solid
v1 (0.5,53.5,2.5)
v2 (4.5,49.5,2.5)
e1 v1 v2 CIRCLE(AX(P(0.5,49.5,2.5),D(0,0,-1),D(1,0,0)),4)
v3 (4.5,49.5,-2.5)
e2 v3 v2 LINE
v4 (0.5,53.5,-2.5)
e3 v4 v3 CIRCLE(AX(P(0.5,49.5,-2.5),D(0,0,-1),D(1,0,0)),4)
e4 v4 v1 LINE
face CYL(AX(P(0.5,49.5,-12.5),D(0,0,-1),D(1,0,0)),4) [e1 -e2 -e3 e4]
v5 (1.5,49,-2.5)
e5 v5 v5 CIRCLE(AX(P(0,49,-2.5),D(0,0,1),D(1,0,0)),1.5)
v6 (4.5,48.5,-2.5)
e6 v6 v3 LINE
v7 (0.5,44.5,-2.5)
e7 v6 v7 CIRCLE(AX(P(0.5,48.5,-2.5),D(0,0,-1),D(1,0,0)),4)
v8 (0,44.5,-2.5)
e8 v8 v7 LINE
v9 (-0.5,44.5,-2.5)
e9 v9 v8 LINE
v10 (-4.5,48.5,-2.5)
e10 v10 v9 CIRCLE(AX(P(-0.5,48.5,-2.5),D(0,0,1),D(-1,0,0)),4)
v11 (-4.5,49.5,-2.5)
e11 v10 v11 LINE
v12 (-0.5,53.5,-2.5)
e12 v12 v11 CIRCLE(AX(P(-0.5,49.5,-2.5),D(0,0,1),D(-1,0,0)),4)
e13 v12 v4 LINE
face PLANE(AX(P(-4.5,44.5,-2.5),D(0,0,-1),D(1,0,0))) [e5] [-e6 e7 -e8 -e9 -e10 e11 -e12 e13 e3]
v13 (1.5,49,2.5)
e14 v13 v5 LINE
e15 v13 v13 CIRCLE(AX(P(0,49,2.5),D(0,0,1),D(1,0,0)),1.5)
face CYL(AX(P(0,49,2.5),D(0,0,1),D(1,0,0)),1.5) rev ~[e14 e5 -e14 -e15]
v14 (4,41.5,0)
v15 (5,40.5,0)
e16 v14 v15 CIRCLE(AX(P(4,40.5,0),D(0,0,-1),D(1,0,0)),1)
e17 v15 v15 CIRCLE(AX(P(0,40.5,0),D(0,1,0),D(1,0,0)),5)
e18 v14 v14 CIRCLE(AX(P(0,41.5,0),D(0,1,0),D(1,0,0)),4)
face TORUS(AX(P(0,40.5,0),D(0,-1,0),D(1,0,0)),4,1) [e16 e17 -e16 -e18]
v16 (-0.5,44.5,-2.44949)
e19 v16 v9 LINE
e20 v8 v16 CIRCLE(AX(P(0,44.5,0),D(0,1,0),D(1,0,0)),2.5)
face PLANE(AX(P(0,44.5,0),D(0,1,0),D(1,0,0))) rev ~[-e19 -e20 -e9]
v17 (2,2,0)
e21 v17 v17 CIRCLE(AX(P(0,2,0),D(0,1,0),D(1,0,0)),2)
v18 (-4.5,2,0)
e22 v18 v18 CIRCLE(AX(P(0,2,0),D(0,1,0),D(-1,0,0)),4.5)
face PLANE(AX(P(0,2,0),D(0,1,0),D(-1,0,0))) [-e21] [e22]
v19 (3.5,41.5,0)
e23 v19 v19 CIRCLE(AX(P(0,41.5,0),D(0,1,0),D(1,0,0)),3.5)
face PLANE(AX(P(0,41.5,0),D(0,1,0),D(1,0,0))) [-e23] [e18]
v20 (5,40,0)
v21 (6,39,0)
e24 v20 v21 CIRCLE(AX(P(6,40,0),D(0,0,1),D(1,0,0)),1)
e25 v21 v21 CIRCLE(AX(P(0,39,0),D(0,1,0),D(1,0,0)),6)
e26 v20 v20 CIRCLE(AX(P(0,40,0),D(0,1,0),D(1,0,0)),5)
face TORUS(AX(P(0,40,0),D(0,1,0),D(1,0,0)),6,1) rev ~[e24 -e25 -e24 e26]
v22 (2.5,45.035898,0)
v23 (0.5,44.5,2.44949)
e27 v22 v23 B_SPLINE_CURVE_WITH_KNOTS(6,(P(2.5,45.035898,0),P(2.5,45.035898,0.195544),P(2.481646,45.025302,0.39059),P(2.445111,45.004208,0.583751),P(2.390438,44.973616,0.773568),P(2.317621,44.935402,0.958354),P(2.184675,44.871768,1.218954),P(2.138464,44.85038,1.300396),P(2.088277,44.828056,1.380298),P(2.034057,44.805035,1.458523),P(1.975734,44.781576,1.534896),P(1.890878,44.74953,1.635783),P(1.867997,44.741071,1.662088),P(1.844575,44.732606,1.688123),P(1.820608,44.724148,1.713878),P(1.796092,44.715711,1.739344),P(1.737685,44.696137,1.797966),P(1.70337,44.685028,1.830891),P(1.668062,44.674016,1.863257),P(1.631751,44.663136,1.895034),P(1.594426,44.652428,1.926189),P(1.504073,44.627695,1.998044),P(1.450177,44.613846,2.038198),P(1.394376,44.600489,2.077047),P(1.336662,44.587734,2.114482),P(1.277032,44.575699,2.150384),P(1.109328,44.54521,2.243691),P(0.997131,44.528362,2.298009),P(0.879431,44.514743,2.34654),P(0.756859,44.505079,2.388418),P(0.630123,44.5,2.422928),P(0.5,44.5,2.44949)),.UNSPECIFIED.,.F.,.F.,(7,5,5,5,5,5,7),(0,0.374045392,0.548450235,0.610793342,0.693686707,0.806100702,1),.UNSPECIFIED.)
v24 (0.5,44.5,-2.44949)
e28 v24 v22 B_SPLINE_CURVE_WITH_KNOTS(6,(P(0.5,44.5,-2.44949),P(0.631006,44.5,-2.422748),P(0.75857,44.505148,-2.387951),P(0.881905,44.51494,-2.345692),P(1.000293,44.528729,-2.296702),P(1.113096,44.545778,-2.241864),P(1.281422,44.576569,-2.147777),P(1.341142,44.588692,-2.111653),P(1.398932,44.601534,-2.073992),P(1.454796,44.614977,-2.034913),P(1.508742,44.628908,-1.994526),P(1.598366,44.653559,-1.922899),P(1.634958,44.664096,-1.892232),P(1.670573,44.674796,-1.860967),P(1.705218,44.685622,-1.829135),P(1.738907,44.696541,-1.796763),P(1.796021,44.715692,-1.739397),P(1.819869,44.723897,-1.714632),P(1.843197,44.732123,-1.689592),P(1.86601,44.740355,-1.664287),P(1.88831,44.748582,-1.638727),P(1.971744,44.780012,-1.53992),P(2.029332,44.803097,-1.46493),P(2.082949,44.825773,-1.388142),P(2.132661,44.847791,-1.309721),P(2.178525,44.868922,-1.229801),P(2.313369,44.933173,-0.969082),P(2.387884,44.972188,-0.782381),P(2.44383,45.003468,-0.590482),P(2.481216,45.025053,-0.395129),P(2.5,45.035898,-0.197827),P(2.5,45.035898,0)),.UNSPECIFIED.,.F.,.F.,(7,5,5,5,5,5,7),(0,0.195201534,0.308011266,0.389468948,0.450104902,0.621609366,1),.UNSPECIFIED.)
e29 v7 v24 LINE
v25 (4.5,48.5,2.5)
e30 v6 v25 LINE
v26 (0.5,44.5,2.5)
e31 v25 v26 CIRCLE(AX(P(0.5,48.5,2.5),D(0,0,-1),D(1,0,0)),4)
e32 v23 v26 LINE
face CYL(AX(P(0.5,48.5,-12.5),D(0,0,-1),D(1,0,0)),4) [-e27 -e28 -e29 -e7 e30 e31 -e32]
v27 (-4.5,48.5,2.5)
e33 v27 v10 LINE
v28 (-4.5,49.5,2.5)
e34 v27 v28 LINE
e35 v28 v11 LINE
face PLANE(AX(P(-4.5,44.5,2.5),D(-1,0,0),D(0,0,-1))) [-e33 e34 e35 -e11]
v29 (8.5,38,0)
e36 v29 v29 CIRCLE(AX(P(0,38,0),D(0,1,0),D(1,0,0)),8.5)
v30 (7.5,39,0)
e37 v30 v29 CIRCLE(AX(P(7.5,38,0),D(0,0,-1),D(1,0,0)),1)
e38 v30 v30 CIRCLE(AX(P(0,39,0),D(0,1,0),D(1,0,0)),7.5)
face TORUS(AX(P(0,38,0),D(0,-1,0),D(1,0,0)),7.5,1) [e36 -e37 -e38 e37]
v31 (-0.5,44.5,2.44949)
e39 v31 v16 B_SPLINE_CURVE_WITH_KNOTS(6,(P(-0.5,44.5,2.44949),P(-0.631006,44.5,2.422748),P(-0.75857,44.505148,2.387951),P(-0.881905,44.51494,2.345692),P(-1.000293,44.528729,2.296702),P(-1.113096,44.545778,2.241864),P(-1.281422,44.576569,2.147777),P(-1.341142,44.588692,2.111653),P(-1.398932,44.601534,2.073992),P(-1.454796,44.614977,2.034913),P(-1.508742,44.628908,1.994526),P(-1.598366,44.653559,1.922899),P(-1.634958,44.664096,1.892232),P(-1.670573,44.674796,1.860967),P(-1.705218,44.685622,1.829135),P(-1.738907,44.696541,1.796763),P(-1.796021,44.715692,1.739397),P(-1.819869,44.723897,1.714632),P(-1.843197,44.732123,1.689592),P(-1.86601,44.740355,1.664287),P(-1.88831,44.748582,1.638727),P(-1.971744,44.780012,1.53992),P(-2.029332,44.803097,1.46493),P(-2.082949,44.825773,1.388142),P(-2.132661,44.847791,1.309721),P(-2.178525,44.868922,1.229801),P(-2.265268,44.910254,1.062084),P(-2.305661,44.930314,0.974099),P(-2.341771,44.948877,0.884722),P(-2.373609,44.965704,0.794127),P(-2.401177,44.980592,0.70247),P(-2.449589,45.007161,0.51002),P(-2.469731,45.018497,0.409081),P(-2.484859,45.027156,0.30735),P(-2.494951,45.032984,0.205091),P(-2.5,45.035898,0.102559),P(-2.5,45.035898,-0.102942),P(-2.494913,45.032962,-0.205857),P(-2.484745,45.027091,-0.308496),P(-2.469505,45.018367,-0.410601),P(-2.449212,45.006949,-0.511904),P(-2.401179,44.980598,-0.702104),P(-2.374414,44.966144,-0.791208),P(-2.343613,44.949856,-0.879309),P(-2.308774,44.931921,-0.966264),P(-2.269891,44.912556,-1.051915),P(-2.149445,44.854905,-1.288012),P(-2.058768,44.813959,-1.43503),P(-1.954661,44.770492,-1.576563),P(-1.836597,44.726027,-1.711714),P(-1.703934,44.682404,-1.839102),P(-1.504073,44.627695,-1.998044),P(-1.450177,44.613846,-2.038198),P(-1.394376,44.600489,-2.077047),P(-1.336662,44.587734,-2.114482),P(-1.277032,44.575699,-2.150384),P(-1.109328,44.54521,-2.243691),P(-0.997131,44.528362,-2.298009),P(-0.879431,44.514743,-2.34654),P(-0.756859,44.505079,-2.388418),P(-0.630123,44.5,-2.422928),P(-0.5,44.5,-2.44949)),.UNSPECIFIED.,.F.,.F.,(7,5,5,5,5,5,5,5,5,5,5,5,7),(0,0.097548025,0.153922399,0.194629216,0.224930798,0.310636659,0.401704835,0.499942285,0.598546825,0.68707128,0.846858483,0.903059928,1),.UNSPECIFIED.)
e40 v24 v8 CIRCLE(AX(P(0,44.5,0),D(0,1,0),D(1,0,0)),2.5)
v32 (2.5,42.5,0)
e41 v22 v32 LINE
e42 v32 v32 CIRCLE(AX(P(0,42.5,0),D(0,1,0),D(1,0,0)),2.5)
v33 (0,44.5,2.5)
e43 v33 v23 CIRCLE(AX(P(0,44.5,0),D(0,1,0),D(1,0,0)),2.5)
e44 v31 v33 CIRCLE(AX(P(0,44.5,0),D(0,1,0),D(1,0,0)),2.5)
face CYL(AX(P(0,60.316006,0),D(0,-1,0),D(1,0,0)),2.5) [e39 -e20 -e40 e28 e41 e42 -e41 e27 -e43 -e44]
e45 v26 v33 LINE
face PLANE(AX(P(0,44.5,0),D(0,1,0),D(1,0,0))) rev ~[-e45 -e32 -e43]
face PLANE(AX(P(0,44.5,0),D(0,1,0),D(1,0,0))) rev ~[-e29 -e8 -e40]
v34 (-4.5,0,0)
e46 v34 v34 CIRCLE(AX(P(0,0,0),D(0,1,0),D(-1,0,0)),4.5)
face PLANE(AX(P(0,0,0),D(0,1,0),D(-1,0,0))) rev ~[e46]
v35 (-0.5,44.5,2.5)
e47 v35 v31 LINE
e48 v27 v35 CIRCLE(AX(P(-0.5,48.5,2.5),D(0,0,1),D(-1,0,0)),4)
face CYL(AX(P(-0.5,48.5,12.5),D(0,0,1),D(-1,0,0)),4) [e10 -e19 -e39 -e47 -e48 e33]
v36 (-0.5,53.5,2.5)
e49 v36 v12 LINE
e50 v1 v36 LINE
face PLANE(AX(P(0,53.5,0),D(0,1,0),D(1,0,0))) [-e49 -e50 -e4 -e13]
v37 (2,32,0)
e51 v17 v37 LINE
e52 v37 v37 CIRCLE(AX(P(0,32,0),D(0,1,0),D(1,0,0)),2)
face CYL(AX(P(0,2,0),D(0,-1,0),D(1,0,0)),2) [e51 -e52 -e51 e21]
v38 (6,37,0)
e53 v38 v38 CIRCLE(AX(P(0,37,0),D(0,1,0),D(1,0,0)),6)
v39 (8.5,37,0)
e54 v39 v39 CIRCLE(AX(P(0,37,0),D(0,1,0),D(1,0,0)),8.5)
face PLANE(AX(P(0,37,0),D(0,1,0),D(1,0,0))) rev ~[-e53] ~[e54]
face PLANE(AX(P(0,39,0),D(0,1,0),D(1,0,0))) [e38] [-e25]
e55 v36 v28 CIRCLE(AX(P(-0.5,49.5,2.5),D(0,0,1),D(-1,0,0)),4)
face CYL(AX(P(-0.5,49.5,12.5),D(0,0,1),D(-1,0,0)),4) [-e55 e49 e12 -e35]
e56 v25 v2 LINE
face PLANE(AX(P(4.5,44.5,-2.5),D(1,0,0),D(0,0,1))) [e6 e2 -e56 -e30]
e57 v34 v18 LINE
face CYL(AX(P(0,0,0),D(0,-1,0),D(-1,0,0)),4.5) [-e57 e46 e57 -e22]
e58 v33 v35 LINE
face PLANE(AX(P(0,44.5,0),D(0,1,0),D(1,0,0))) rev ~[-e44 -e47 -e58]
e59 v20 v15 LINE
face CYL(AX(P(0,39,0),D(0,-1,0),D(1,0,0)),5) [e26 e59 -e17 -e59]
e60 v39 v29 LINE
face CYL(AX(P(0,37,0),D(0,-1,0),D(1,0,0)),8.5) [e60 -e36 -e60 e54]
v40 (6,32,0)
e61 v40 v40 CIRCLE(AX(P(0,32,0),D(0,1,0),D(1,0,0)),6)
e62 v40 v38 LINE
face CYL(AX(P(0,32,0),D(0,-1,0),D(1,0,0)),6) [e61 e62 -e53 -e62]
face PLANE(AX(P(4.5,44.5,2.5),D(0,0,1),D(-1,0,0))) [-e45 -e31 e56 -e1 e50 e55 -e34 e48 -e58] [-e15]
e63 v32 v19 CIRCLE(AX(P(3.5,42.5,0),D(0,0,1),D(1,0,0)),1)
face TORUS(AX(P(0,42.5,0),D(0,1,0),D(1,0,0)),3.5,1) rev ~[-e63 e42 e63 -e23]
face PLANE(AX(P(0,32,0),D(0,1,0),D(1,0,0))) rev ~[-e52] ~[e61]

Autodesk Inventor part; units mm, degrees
ref_plane "YZ Plane" through (0, 0, 0) normal (1, 0, 0) x (0, 1, 0)
ref_plane "XZ Plane" through (0, 0, 0) normal (0, 1, 0) x (-1, 0, 0)
ref_plane "XY Plane" through (0, 0, 0) normal (0, 0, 1) x (1, 0, 0)
sketch "Szkic1" plane through (0, 0, 0) normal (0, 1, 0) x (-1, 0, 0)
  circle A0 centre (0, 0) radius 4.5
  dimension "d0" = 9
extrude "Wyciągnięcie proste1" add sketch "Szkic1" along normal blind 2
sketch "Szkic2" plane through (0, 2, 0) normal (0, 1, 0) x (1, 0, 0)
  circle A0 centre (0, 0) radius 2
  dimension "d3" = 4
extrude "Wyciągnięcie proste2" add sketch "Szkic2" along normal blind 30
sketch "Szkic3" plane through (0, 32, 0) normal (0, 1, 0) x (1, 0, 0)
  circle A0 centre (0, 0) radius 6
  dimension "d6" = 12
extrude "Wyciągnięcie proste3" add sketch "Szkic3" along normal blind 5
sketch "Szkic4" plane through (0, 37, 0) normal (0, 1, 0) x (1, 0, 0)
  circle A0 centre (0, 0) radius 8.5
  dimension "d9" = 17
extrude "Wyciągnięcie proste4" add sketch "Szkic4" along normal blind 2
sketch "Szkic5" plane through (0, 39, 0) normal (0, 1, 0) x (1, 0, 0)
  circle A0 centre (0, 0) radius 5
  dimension "d12" = 10
extrude "Wyciągnięcie proste5" add sketch "Szkic5" along normal blind 2.5
sketch "Szkic6" plane through (0, 41.5, 0) normal (0, 1, 0) x (1, 0, 0)
  circle A0 centre (0, 0) radius 2.5
  dimension "d15" = 5
extrude "Wyciągnięcie proste6" add sketch "Szkic6" along normal blind 3
sketch "Szkic7" plane through (0, 44.5, 0) normal (0, 1, 0) x (1, 0, 0)
  line L0 (4.5, -2.5) -> (-4.5, -2.5)
  line L1 (-4.5, -2.5) -> (-4.5, 2.5)
  line L2 (-4.5, 2.5) -> (4.5, 2.5)
  line L3 (4.5, 2.5) -> (4.5, -2.5)
  line L4 (4.5, -2.5) -> (-4.5, 2.5) construction
  line L5 (-4.5, -2.5) -> (4.5, 2.5) construction
  point P0 (0, 0)
  dimension "d18" = 9
  dimension "d19" = 5
extrude "Wyciągnięcie proste7" add sketch "Szkic7" along normal blind 9
fillet "Zaokrąglenie1" radius 4 4 edges at (4.5, 44.5, 0) (4.5, 53.5, 0) (-4.5, 53.5, 0) (-4.5, 44.5, 0)
sketch "Szkic8" plane through (-0.5, 44.5, 2.5) normal (0, 0, 1) x (1, 0, 0)
  line L0 (0, 9) -> (1, 9) projected
  line L1 (-4, 4) -> (-4, 5) projected
  circle A0 centre (0.5, 4.5) radius 1.5
  line L2 (0, 0) -> (0.5, 0) projected
  line L3 (5, 4) -> (5, 5) projected
  point P0 (0.5, -44.5)
  dimension "d23" = 3
  dimension "d26" = 9
  dimension "d27" = 9
  dimension "d28" = 4.5
  dimension "d29" = 4.5
extrude "Wyciągnięcie proste8" cut sketch "Szkic8" against normal blind 10
fillet "Zaokrąglenie2" radius 1 4 edges at (-8.5, 39, 0) (-5, 39, 0) (-5, 41.5, 0) (-2.5, 41.5, 0)
equation "\"d28\" = 0.5 * d26"
equation "\"d29\" = 0.5 * d27"
properties part number "Tlok" material "Aluminum 6061"
